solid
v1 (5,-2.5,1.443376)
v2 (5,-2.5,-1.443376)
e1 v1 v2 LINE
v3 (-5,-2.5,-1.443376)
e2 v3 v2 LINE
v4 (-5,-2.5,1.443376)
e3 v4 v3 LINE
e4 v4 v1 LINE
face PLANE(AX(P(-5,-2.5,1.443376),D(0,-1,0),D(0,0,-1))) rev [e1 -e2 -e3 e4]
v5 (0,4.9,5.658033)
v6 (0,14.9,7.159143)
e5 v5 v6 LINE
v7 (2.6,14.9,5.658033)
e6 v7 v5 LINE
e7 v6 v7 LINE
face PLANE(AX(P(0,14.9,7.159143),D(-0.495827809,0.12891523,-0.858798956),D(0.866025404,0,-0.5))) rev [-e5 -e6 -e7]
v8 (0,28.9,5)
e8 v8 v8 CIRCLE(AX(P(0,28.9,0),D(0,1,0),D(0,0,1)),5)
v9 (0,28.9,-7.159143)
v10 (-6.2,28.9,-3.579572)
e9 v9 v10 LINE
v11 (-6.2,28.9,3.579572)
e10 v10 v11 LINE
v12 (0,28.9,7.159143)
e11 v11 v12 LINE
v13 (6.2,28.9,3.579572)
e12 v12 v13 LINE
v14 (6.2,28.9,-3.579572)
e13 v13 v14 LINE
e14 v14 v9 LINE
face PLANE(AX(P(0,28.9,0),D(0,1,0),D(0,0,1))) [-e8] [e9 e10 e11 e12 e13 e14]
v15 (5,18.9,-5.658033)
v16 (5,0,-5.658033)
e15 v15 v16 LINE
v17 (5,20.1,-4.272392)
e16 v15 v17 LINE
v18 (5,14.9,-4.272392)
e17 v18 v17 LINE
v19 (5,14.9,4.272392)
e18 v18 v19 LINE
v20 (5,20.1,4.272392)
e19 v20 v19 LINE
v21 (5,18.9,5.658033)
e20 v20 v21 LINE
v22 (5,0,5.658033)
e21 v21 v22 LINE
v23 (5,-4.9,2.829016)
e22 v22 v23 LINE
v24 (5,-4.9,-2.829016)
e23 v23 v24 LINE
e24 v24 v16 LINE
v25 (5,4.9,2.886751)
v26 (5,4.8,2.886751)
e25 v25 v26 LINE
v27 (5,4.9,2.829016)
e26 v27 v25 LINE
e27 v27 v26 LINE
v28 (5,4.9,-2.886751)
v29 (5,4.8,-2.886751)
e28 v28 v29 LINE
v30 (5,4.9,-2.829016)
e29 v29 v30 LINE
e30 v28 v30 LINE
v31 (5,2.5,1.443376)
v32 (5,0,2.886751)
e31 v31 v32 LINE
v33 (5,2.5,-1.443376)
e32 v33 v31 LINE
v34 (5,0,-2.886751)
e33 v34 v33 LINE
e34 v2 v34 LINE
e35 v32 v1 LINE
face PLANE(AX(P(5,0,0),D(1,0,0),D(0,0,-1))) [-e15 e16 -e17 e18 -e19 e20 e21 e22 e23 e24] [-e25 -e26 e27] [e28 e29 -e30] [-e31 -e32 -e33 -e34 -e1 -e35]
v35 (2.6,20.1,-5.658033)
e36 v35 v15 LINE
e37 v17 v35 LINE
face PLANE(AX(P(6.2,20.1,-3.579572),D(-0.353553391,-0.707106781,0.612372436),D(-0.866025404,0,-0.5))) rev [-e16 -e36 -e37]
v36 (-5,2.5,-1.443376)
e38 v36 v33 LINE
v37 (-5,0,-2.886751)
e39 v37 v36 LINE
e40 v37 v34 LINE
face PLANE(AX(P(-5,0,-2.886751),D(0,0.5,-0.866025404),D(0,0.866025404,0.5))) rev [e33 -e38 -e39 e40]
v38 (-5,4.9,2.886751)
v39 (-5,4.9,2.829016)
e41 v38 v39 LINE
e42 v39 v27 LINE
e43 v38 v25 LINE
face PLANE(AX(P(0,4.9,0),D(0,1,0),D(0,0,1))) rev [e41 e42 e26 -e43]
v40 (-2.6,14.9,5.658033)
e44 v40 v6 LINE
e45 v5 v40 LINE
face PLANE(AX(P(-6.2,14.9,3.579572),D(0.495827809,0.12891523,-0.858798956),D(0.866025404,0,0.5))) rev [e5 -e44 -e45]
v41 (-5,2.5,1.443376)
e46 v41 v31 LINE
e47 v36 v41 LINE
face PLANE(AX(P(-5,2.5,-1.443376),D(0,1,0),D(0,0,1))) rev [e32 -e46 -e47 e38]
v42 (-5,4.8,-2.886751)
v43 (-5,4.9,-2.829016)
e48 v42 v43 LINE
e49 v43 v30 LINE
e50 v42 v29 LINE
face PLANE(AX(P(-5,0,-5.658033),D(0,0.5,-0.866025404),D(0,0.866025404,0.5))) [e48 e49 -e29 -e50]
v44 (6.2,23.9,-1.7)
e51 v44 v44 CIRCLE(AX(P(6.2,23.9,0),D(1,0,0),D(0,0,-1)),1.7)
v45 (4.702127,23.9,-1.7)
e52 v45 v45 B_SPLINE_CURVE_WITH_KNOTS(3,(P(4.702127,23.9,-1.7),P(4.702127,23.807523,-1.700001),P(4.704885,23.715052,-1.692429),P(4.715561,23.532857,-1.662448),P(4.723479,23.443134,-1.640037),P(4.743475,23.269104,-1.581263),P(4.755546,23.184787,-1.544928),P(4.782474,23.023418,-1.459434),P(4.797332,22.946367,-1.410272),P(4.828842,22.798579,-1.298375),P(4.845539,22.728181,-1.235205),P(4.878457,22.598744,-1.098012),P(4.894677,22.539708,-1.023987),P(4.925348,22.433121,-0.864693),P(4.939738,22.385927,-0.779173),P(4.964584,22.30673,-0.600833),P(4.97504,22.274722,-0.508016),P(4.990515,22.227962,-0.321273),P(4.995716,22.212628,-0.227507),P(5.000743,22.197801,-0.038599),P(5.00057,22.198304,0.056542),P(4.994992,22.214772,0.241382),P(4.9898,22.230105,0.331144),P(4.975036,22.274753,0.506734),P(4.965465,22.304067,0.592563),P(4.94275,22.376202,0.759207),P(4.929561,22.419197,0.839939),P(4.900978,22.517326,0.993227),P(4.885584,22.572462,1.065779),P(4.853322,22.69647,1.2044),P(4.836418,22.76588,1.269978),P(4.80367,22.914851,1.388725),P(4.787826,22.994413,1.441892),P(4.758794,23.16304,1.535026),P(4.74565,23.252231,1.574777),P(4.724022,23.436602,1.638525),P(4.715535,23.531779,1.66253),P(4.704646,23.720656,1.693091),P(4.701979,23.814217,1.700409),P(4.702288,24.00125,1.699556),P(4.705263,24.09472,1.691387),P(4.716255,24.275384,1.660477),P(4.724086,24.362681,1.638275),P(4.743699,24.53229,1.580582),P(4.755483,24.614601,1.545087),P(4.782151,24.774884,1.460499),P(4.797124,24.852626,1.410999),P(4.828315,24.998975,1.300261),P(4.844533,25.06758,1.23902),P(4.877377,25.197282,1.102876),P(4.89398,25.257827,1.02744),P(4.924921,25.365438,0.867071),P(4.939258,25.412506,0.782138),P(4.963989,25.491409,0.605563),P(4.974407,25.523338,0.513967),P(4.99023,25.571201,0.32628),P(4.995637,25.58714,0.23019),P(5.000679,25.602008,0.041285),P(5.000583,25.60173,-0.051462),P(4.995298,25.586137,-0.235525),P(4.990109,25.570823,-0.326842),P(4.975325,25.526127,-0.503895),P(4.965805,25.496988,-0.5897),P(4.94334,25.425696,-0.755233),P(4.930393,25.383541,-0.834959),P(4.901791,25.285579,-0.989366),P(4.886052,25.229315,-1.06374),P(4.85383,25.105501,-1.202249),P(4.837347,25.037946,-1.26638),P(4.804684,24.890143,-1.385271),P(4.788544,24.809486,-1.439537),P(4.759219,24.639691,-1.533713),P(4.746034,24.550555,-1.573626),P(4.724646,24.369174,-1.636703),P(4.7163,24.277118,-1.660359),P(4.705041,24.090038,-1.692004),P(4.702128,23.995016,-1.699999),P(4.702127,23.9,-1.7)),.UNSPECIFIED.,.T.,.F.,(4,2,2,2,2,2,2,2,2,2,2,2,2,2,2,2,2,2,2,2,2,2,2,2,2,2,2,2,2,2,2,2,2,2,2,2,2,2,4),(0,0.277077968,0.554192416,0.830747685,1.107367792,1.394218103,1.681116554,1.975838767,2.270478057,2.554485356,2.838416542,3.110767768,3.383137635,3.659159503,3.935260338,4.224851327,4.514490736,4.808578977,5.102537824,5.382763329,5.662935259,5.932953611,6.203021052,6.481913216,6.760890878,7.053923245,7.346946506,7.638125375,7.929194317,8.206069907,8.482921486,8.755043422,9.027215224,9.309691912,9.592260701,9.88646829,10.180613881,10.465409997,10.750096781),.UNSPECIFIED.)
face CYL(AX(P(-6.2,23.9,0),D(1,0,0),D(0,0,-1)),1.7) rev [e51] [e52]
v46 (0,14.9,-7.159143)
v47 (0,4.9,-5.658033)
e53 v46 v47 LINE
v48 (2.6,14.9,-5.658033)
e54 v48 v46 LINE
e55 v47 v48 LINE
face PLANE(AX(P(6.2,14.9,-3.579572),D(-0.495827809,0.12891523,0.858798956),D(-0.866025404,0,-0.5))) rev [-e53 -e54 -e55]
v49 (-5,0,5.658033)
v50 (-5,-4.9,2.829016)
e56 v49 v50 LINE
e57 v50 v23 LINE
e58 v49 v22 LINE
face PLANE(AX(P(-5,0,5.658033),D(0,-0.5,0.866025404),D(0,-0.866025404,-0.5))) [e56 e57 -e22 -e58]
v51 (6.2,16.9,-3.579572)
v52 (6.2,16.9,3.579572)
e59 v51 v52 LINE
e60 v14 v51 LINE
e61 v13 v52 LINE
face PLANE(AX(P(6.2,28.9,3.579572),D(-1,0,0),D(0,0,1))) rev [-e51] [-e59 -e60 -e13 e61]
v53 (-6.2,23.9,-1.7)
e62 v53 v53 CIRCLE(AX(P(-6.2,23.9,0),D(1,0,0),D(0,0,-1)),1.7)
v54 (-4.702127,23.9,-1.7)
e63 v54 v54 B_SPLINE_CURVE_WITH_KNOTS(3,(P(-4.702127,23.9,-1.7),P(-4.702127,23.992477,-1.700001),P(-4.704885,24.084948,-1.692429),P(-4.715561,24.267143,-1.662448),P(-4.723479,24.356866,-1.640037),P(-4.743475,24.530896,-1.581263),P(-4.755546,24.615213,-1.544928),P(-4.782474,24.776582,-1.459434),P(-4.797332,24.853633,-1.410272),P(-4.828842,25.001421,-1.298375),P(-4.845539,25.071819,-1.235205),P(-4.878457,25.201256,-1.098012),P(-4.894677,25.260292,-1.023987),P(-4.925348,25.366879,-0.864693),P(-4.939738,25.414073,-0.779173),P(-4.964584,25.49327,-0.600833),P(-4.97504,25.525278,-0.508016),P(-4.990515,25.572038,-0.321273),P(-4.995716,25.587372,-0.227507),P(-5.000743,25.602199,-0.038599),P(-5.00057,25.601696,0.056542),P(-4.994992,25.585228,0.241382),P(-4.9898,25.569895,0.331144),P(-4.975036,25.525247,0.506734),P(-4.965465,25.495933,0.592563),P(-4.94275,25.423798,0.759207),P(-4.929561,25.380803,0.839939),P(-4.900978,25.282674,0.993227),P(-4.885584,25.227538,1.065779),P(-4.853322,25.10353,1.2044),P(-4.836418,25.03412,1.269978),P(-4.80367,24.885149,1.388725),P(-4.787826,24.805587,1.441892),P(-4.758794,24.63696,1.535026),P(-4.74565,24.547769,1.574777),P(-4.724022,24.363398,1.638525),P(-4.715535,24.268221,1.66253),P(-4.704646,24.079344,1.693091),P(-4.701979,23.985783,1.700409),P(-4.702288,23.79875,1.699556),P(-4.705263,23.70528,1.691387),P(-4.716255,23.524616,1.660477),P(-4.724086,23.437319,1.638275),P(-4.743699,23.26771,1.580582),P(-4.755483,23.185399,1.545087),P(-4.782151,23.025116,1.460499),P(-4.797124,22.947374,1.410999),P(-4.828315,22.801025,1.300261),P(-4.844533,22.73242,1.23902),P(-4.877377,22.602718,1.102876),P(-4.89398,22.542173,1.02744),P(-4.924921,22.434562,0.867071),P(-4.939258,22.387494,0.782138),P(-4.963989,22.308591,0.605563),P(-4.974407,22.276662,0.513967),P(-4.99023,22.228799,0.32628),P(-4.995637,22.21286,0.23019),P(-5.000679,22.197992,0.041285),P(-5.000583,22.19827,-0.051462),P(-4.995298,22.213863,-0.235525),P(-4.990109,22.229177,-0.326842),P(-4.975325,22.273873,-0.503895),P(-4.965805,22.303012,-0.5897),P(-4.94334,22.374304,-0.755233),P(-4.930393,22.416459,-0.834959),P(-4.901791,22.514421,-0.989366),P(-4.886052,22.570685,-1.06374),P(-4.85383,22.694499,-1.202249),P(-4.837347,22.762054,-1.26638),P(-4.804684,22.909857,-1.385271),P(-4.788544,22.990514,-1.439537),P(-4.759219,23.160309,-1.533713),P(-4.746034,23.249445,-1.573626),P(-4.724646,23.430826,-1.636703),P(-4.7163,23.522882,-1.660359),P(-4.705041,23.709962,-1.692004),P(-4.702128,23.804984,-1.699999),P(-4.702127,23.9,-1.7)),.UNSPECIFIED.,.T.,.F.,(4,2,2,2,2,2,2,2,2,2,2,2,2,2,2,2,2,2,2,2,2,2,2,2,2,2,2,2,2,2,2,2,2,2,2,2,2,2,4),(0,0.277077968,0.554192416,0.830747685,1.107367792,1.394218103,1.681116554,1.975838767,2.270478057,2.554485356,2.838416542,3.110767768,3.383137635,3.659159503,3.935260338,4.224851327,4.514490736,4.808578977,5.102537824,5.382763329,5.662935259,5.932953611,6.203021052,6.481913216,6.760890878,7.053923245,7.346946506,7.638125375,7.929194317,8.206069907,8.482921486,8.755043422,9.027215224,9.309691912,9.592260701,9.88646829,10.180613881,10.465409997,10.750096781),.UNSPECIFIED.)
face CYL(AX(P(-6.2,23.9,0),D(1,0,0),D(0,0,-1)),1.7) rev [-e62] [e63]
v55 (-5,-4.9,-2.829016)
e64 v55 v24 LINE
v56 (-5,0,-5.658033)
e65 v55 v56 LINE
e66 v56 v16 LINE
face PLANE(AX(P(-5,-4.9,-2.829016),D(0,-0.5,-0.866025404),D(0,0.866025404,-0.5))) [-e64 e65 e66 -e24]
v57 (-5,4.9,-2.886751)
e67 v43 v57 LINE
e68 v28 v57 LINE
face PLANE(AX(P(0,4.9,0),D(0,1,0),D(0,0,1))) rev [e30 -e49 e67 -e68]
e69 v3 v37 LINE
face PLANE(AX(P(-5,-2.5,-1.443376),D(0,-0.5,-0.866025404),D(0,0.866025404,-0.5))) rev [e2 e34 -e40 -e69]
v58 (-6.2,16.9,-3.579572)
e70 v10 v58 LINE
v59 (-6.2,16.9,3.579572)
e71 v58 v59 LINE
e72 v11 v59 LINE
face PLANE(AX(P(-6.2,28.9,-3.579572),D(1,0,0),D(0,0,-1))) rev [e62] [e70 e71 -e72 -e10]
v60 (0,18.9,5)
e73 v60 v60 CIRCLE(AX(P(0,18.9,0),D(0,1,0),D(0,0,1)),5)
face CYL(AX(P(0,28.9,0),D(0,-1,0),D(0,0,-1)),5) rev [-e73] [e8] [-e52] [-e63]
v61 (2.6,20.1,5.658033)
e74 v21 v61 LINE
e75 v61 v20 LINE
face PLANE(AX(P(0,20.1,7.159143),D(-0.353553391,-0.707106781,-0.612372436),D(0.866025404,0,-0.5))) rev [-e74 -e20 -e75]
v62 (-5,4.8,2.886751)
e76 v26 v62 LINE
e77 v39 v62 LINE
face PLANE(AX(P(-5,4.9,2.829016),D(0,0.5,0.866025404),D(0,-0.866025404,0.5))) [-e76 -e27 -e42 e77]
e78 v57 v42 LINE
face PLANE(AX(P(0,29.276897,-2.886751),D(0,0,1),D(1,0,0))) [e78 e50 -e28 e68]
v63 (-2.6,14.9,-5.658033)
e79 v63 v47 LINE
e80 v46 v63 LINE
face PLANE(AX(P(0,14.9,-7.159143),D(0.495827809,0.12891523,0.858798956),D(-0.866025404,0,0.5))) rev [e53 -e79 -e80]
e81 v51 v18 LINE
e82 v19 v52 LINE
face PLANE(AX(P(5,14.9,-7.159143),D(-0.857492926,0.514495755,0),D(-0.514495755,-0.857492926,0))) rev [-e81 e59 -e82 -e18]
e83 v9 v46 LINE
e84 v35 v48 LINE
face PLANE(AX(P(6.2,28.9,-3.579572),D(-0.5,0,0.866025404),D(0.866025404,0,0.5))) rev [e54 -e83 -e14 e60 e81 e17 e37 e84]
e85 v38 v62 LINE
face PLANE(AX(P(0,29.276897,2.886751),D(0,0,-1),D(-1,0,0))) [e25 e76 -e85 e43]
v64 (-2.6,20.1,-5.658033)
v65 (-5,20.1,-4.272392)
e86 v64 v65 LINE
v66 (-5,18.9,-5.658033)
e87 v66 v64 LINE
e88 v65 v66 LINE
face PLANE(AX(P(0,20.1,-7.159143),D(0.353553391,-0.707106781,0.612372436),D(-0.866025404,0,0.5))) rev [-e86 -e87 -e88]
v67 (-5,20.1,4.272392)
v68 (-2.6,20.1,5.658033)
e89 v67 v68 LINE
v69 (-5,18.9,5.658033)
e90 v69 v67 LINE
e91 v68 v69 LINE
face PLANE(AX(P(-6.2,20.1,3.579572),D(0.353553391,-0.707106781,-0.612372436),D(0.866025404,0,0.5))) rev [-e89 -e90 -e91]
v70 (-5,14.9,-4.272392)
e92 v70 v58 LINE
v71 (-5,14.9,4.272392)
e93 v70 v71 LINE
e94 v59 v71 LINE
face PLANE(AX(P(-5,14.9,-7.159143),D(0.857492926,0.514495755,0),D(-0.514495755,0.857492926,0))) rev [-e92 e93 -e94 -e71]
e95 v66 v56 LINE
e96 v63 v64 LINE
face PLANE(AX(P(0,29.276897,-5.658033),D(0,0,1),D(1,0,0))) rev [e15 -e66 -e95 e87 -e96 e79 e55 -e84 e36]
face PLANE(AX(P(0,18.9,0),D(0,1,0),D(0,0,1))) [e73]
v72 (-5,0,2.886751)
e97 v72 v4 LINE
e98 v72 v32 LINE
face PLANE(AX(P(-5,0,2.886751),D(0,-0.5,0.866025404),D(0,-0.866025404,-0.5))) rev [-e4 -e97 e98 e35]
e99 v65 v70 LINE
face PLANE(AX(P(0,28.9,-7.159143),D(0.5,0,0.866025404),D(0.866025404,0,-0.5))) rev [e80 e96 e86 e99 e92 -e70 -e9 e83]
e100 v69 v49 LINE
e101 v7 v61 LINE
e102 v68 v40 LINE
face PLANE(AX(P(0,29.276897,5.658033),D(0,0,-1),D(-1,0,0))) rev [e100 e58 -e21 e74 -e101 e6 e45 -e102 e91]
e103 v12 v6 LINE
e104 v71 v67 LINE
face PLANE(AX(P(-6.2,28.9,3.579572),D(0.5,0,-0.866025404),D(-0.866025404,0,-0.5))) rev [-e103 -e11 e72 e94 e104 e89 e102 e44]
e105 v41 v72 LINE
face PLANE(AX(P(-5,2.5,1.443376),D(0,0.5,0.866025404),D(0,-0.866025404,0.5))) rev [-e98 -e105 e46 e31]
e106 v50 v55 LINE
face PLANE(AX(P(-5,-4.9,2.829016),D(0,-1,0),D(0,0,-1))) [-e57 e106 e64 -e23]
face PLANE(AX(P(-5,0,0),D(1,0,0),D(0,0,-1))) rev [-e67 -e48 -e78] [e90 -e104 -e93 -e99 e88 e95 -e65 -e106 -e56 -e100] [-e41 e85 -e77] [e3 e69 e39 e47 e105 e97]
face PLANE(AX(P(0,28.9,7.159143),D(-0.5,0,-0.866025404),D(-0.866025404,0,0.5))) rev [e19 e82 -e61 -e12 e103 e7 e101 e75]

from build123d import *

# Parameters (mm, degrees)
SALIENTE_EXTRUIR1_DEPTH      = 5
SALIENTE_EXTRUIR1_DEPTH_BACK = 5
SALIENTE_EXTRUIR2_START      = 14
CROQUIS2_R                   = 5
SALIENTE_EXTRUIR2_DEPTH      = 10
CROQUIS4_W                   = 10
CROQUIS4_H                   = 2.771281292
SALIENTE_EXTRUIR3_DEPTH      = 18.9
CHAFL_N1_SIZE                = 1.2
CROQUIS5_R                   = 1.7
CORTAR_EXTRUIR1_DEPTH        = 33.252493444
CROQUIS2_4_R                 = 5
SALIENTE_EXTRUIR8_DEPTH      = 14
CHAFL_N2_SIZE                = 10
CHAFL_N2_SIZE_2              = 1.3
CORTAR_EXTRUIR2_DEPTH        = 31.412223535
CORTAR_EXTRUIR2_DEPTH_BACK   = 31.412223535


# Some blends are built 0.0001 mm under size
with BuildPart() as part:
    # Croquis1 → Saliente-Extruir1 (new, two sides: drawn at the far end of the back side and taken through both)
    with BuildSketch(Plane(origin=(0, 0, 0), x_dir=(0, 0, -1), z_dir=(1, 0, 0)).offset(-SALIENTE_EXTRUIR1_DEPTH_BACK)):
        Polygon((2.829016319, 4.9), (-2.829016319, 4.9), (-5.658032638, 0), (-2.829016319, -4.9), (2.829016319, -4.9), (5.658032638, 0), align=None)
        Polygon((2.886751346, 0), (1.443375673, 2.5), (-1.443375673, 2.5), (-2.886751346, 0), (-1.443375673, -2.5), (1.443375673, -2.5), align=None, mode=Mode.SUBTRACT)
    extrude(amount=SALIENTE_EXTRUIR1_DEPTH + SALIENTE_EXTRUIR1_DEPTH_BACK)



with BuildPart() as body_2:
    # Croquis2 → Saliente-Extruir2 (new body)
    with BuildSketch(Plane(origin=(0, 4.9, 0), x_dir=(1, 0, 0), z_dir=(0, 1, 0)).offset(SALIENTE_EXTRUIR2_START)):
        Polygon((0, 7.159143338), (-6.2, 3.579571669), (-6.2, -3.579571669), (0, -7.159143338), (6.2, -3.579571669), (6.2, 3.579571669), align=None)
        with Locations(Location((0, 0, 0), (0, 0, 270))):
            Circle(CROQUIS2_R, mode=Mode.SUBTRACT)
    extrude(amount=SALIENTE_EXTRUIR2_DEPTH)


with BuildPart() as part_1:
    add(part.part)

    add(body_2.part)  # Saliente-Extruir3 merges body 2
    # Croquis4 → Saliente-Extruir3 (add)
    with BuildSketch(Plane(origin=(0, 0, 0), x_dir=(1, 0, 0), z_dir=(0, 1, 0))):
        with Locations((0, -4.272391992)):
            Rectangle(CROQUIS4_W, CROQUIS4_H)
        with Locations((0, 4.272391992)):
            Rectangle(CROQUIS4_W, CROQUIS4_H)
    extrude(amount=SALIENTE_EXTRUIR3_DEPTH)

    # Chaflán1
    chafl_n1_edges = [part_1.edges().sort_by_distance(p)[0] for p in [
        (3.8, 18.9, 4.965212315),
        (-3.8, 18.9, 4.965212315),
        (-3.8, 18.9, -4.965212315),
        (3.8, 18.9, -4.965212315),
    ]]
    chamfer(chafl_n1_edges, length=CHAFL_N1_SIZE - 0.0001)  # a hair under: the kernel refuses the full size

    # Croquis5 → Cortar-Extruir1 (cut, through all)
    with BuildSketch(Plane(origin=(6.2, 0, 0), x_dir=(0, 0, -1), z_dir=(1, 0, 0))):
        with Locations((0, 23.9)):
            Circle(CROQUIS5_R)
    extrude(amount=-CORTAR_EXTRUIR1_DEPTH, mode=Mode.SUBTRACT)

    # Croquis2<4> → Saliente-Extruir8 (add)
    # profile 1 of 2: a face of its own
    with BuildSketch(Plane(origin=(0, 4.9, 0), x_dir=(1, 0, 0), z_dir=(0, 1, 0))):
        Polygon((6.2, -3.579571669), (6.2, 3.579571669), (0, 7.159143338), (-6.2, 3.579571669), (-6.2, -3.579571669), (0, -7.159143338), align=None)
        with Locations(Location((0, 0, 0), (0, 0, 270))):
            Circle(CROQUIS2_4_R, mode=Mode.SUBTRACT)
    # profile 2 of 2: a face of its own
    with BuildSketch(Plane(origin=(0, 4.9, 0), x_dir=(1, 0, 0), z_dir=(0, 1, 0))):
        with Locations(Location((0, 0, 0), (0, 0, 270))):
            Circle(CROQUIS2_4_R)
    extrude(amount=SALIENTE_EXTRUIR8_DEPTH)

    # Chaflán2
    # the kernel refuses this chamfer: 10, 1.3 mm, written as the material it takes off along each edge
    with BuildSketch(Plane(origin=(-25.109710919, 4.9, -7.33795502), x_dir=(-0.00247990444519022, 0.9999877000722412, 0.004295320496985479), z_dir=(0.8660254037844387, 0, 0.5000000000000001))) as chafl_n2_piece_1_section:
        Polygon((CHAFL_N2_SIZE * 0.999987700072, -CHAFL_N2_SIZE * 0.00495980889038), (-CHAFL_N2_SIZE_2 * 0.00495980889038, -CHAFL_N2_SIZE_2 * 0.999987700072), (0, 0), align=None)
    chafl_n2_piece_1 = extrude(amount=54.986172033, mode=Mode.PRIVATE)
    chafl_n2_piece_1 = split(chafl_n2_piece_1, bisect_by=Plane(origin=(-0.715, 8.4, 5.658032638), z_dir=(0, 0, 1)), keep=Keep.TOP, mode=Mode.PRIVATE)
    add(chafl_n2_piece_1, mode=Mode.SUBTRACT)
    with BuildSketch(Plane(origin=(-22.509710919, 4.9, 20.155130996), x_dir=(-0.47976503705991164, -0.28160617333362153, -0.8309774198829328), z_dir=(0.8660254037844388, 0, -0.49999999999999967))) as chafl_n2_piece_2_section:
        Polygon((CHAFL_N2_SIZE_2 * 0.95953007412, CHAFL_N2_SIZE_2 * 0.281606173334), (-CHAFL_N2_SIZE * 0.281606173334, CHAFL_N2_SIZE * 0.95953007412), (0, 0), align=None)
    chafl_n2_piece_2 = extrude(amount=54.986172033, mode=Mode.PRIVATE)
    chafl_n2_piece_2 = split(chafl_n2_piece_2, bisect_by=Plane(origin=(0.715, 8.4, 5.658032638), z_dir=(0, 0, 1)), keep=Keep.TOP, mode=Mode.PRIVATE)
    add(chafl_n2_piece_2, mode=Mode.SUBTRACT)
    with BuildSketch(Plane(origin=(22.509710919, 4.9, -20.155130996), x_dir=(-0.002479904445190118, 0.9999877000722412, -0.004295320496985084), z_dir=(-0.8660254037844387, 0, 0.49999999999999994))) as chafl_n2_piece_3_section:
        Polygon((CHAFL_N2_SIZE * 0.999987700072, -CHAFL_N2_SIZE * 0.00495980889038), (-CHAFL_N2_SIZE_2 * 0.00495980889038, -CHAFL_N2_SIZE_2 * 0.999987700072), (0, 0), align=None)
    chafl_n2_piece_3 = extrude(amount=54.986172033, mode=Mode.PRIVATE)
    chafl_n2_piece_3 = split(chafl_n2_piece_3, bisect_by=Plane(origin=(-0.715, 8.4, -5.658032638), z_dir=(0, 0, -1)), keep=Keep.TOP, mode=Mode.PRIVATE)
    add(chafl_n2_piece_3, mode=Mode.SUBTRACT)
    with BuildSketch(Plane(origin=(25.109710919, 4.9, 7.33795502), x_dir=(-0.4797650370599119, -0.28160617333362137, 0.8309774198829327), z_dir=(-0.8660254037844387, 0, -0.5000000000000001))) as chafl_n2_piece_4_section:
        Polygon((CHAFL_N2_SIZE_2 * 0.95953007412, CHAFL_N2_SIZE_2 * 0.281606173334), (-CHAFL_N2_SIZE * 0.281606173334, CHAFL_N2_SIZE * 0.95953007412), (0, 0), align=None)
    chafl_n2_piece_4 = extrude(amount=54.986172033, mode=Mode.PRIVATE)
    chafl_n2_piece_4 = split(chafl_n2_piece_4, bisect_by=Plane(origin=(0.715, 8.4, -5.658032638), z_dir=(0, 0, -1)), keep=Keep.TOP, mode=Mode.PRIVATE)
    add(chafl_n2_piece_4, mode=Mode.SUBTRACT)

    # Croquis6 → Cortar-Extruir2 (cut, two sides: drawn at the far end of the back side and taken through both)
    with BuildSketch(Plane.XY.offset(-CORTAR_EXTRUIR2_DEPTH_BACK)):
        Polygon((5, 14.9), (6.2, 16.9), (6.2, 4.9), (5, 4.9), align=None)
        Polygon((-6.2, 4.9), (-5, 4.9), (-5, 14.9), (-6.2, 16.9), align=None)
    extrude(amount=CORTAR_EXTRUIR2_DEPTH + CORTAR_EXTRUIR2_DEPTH_BACK, mode=Mode.SUBTRACT)


solid = part_1.part
